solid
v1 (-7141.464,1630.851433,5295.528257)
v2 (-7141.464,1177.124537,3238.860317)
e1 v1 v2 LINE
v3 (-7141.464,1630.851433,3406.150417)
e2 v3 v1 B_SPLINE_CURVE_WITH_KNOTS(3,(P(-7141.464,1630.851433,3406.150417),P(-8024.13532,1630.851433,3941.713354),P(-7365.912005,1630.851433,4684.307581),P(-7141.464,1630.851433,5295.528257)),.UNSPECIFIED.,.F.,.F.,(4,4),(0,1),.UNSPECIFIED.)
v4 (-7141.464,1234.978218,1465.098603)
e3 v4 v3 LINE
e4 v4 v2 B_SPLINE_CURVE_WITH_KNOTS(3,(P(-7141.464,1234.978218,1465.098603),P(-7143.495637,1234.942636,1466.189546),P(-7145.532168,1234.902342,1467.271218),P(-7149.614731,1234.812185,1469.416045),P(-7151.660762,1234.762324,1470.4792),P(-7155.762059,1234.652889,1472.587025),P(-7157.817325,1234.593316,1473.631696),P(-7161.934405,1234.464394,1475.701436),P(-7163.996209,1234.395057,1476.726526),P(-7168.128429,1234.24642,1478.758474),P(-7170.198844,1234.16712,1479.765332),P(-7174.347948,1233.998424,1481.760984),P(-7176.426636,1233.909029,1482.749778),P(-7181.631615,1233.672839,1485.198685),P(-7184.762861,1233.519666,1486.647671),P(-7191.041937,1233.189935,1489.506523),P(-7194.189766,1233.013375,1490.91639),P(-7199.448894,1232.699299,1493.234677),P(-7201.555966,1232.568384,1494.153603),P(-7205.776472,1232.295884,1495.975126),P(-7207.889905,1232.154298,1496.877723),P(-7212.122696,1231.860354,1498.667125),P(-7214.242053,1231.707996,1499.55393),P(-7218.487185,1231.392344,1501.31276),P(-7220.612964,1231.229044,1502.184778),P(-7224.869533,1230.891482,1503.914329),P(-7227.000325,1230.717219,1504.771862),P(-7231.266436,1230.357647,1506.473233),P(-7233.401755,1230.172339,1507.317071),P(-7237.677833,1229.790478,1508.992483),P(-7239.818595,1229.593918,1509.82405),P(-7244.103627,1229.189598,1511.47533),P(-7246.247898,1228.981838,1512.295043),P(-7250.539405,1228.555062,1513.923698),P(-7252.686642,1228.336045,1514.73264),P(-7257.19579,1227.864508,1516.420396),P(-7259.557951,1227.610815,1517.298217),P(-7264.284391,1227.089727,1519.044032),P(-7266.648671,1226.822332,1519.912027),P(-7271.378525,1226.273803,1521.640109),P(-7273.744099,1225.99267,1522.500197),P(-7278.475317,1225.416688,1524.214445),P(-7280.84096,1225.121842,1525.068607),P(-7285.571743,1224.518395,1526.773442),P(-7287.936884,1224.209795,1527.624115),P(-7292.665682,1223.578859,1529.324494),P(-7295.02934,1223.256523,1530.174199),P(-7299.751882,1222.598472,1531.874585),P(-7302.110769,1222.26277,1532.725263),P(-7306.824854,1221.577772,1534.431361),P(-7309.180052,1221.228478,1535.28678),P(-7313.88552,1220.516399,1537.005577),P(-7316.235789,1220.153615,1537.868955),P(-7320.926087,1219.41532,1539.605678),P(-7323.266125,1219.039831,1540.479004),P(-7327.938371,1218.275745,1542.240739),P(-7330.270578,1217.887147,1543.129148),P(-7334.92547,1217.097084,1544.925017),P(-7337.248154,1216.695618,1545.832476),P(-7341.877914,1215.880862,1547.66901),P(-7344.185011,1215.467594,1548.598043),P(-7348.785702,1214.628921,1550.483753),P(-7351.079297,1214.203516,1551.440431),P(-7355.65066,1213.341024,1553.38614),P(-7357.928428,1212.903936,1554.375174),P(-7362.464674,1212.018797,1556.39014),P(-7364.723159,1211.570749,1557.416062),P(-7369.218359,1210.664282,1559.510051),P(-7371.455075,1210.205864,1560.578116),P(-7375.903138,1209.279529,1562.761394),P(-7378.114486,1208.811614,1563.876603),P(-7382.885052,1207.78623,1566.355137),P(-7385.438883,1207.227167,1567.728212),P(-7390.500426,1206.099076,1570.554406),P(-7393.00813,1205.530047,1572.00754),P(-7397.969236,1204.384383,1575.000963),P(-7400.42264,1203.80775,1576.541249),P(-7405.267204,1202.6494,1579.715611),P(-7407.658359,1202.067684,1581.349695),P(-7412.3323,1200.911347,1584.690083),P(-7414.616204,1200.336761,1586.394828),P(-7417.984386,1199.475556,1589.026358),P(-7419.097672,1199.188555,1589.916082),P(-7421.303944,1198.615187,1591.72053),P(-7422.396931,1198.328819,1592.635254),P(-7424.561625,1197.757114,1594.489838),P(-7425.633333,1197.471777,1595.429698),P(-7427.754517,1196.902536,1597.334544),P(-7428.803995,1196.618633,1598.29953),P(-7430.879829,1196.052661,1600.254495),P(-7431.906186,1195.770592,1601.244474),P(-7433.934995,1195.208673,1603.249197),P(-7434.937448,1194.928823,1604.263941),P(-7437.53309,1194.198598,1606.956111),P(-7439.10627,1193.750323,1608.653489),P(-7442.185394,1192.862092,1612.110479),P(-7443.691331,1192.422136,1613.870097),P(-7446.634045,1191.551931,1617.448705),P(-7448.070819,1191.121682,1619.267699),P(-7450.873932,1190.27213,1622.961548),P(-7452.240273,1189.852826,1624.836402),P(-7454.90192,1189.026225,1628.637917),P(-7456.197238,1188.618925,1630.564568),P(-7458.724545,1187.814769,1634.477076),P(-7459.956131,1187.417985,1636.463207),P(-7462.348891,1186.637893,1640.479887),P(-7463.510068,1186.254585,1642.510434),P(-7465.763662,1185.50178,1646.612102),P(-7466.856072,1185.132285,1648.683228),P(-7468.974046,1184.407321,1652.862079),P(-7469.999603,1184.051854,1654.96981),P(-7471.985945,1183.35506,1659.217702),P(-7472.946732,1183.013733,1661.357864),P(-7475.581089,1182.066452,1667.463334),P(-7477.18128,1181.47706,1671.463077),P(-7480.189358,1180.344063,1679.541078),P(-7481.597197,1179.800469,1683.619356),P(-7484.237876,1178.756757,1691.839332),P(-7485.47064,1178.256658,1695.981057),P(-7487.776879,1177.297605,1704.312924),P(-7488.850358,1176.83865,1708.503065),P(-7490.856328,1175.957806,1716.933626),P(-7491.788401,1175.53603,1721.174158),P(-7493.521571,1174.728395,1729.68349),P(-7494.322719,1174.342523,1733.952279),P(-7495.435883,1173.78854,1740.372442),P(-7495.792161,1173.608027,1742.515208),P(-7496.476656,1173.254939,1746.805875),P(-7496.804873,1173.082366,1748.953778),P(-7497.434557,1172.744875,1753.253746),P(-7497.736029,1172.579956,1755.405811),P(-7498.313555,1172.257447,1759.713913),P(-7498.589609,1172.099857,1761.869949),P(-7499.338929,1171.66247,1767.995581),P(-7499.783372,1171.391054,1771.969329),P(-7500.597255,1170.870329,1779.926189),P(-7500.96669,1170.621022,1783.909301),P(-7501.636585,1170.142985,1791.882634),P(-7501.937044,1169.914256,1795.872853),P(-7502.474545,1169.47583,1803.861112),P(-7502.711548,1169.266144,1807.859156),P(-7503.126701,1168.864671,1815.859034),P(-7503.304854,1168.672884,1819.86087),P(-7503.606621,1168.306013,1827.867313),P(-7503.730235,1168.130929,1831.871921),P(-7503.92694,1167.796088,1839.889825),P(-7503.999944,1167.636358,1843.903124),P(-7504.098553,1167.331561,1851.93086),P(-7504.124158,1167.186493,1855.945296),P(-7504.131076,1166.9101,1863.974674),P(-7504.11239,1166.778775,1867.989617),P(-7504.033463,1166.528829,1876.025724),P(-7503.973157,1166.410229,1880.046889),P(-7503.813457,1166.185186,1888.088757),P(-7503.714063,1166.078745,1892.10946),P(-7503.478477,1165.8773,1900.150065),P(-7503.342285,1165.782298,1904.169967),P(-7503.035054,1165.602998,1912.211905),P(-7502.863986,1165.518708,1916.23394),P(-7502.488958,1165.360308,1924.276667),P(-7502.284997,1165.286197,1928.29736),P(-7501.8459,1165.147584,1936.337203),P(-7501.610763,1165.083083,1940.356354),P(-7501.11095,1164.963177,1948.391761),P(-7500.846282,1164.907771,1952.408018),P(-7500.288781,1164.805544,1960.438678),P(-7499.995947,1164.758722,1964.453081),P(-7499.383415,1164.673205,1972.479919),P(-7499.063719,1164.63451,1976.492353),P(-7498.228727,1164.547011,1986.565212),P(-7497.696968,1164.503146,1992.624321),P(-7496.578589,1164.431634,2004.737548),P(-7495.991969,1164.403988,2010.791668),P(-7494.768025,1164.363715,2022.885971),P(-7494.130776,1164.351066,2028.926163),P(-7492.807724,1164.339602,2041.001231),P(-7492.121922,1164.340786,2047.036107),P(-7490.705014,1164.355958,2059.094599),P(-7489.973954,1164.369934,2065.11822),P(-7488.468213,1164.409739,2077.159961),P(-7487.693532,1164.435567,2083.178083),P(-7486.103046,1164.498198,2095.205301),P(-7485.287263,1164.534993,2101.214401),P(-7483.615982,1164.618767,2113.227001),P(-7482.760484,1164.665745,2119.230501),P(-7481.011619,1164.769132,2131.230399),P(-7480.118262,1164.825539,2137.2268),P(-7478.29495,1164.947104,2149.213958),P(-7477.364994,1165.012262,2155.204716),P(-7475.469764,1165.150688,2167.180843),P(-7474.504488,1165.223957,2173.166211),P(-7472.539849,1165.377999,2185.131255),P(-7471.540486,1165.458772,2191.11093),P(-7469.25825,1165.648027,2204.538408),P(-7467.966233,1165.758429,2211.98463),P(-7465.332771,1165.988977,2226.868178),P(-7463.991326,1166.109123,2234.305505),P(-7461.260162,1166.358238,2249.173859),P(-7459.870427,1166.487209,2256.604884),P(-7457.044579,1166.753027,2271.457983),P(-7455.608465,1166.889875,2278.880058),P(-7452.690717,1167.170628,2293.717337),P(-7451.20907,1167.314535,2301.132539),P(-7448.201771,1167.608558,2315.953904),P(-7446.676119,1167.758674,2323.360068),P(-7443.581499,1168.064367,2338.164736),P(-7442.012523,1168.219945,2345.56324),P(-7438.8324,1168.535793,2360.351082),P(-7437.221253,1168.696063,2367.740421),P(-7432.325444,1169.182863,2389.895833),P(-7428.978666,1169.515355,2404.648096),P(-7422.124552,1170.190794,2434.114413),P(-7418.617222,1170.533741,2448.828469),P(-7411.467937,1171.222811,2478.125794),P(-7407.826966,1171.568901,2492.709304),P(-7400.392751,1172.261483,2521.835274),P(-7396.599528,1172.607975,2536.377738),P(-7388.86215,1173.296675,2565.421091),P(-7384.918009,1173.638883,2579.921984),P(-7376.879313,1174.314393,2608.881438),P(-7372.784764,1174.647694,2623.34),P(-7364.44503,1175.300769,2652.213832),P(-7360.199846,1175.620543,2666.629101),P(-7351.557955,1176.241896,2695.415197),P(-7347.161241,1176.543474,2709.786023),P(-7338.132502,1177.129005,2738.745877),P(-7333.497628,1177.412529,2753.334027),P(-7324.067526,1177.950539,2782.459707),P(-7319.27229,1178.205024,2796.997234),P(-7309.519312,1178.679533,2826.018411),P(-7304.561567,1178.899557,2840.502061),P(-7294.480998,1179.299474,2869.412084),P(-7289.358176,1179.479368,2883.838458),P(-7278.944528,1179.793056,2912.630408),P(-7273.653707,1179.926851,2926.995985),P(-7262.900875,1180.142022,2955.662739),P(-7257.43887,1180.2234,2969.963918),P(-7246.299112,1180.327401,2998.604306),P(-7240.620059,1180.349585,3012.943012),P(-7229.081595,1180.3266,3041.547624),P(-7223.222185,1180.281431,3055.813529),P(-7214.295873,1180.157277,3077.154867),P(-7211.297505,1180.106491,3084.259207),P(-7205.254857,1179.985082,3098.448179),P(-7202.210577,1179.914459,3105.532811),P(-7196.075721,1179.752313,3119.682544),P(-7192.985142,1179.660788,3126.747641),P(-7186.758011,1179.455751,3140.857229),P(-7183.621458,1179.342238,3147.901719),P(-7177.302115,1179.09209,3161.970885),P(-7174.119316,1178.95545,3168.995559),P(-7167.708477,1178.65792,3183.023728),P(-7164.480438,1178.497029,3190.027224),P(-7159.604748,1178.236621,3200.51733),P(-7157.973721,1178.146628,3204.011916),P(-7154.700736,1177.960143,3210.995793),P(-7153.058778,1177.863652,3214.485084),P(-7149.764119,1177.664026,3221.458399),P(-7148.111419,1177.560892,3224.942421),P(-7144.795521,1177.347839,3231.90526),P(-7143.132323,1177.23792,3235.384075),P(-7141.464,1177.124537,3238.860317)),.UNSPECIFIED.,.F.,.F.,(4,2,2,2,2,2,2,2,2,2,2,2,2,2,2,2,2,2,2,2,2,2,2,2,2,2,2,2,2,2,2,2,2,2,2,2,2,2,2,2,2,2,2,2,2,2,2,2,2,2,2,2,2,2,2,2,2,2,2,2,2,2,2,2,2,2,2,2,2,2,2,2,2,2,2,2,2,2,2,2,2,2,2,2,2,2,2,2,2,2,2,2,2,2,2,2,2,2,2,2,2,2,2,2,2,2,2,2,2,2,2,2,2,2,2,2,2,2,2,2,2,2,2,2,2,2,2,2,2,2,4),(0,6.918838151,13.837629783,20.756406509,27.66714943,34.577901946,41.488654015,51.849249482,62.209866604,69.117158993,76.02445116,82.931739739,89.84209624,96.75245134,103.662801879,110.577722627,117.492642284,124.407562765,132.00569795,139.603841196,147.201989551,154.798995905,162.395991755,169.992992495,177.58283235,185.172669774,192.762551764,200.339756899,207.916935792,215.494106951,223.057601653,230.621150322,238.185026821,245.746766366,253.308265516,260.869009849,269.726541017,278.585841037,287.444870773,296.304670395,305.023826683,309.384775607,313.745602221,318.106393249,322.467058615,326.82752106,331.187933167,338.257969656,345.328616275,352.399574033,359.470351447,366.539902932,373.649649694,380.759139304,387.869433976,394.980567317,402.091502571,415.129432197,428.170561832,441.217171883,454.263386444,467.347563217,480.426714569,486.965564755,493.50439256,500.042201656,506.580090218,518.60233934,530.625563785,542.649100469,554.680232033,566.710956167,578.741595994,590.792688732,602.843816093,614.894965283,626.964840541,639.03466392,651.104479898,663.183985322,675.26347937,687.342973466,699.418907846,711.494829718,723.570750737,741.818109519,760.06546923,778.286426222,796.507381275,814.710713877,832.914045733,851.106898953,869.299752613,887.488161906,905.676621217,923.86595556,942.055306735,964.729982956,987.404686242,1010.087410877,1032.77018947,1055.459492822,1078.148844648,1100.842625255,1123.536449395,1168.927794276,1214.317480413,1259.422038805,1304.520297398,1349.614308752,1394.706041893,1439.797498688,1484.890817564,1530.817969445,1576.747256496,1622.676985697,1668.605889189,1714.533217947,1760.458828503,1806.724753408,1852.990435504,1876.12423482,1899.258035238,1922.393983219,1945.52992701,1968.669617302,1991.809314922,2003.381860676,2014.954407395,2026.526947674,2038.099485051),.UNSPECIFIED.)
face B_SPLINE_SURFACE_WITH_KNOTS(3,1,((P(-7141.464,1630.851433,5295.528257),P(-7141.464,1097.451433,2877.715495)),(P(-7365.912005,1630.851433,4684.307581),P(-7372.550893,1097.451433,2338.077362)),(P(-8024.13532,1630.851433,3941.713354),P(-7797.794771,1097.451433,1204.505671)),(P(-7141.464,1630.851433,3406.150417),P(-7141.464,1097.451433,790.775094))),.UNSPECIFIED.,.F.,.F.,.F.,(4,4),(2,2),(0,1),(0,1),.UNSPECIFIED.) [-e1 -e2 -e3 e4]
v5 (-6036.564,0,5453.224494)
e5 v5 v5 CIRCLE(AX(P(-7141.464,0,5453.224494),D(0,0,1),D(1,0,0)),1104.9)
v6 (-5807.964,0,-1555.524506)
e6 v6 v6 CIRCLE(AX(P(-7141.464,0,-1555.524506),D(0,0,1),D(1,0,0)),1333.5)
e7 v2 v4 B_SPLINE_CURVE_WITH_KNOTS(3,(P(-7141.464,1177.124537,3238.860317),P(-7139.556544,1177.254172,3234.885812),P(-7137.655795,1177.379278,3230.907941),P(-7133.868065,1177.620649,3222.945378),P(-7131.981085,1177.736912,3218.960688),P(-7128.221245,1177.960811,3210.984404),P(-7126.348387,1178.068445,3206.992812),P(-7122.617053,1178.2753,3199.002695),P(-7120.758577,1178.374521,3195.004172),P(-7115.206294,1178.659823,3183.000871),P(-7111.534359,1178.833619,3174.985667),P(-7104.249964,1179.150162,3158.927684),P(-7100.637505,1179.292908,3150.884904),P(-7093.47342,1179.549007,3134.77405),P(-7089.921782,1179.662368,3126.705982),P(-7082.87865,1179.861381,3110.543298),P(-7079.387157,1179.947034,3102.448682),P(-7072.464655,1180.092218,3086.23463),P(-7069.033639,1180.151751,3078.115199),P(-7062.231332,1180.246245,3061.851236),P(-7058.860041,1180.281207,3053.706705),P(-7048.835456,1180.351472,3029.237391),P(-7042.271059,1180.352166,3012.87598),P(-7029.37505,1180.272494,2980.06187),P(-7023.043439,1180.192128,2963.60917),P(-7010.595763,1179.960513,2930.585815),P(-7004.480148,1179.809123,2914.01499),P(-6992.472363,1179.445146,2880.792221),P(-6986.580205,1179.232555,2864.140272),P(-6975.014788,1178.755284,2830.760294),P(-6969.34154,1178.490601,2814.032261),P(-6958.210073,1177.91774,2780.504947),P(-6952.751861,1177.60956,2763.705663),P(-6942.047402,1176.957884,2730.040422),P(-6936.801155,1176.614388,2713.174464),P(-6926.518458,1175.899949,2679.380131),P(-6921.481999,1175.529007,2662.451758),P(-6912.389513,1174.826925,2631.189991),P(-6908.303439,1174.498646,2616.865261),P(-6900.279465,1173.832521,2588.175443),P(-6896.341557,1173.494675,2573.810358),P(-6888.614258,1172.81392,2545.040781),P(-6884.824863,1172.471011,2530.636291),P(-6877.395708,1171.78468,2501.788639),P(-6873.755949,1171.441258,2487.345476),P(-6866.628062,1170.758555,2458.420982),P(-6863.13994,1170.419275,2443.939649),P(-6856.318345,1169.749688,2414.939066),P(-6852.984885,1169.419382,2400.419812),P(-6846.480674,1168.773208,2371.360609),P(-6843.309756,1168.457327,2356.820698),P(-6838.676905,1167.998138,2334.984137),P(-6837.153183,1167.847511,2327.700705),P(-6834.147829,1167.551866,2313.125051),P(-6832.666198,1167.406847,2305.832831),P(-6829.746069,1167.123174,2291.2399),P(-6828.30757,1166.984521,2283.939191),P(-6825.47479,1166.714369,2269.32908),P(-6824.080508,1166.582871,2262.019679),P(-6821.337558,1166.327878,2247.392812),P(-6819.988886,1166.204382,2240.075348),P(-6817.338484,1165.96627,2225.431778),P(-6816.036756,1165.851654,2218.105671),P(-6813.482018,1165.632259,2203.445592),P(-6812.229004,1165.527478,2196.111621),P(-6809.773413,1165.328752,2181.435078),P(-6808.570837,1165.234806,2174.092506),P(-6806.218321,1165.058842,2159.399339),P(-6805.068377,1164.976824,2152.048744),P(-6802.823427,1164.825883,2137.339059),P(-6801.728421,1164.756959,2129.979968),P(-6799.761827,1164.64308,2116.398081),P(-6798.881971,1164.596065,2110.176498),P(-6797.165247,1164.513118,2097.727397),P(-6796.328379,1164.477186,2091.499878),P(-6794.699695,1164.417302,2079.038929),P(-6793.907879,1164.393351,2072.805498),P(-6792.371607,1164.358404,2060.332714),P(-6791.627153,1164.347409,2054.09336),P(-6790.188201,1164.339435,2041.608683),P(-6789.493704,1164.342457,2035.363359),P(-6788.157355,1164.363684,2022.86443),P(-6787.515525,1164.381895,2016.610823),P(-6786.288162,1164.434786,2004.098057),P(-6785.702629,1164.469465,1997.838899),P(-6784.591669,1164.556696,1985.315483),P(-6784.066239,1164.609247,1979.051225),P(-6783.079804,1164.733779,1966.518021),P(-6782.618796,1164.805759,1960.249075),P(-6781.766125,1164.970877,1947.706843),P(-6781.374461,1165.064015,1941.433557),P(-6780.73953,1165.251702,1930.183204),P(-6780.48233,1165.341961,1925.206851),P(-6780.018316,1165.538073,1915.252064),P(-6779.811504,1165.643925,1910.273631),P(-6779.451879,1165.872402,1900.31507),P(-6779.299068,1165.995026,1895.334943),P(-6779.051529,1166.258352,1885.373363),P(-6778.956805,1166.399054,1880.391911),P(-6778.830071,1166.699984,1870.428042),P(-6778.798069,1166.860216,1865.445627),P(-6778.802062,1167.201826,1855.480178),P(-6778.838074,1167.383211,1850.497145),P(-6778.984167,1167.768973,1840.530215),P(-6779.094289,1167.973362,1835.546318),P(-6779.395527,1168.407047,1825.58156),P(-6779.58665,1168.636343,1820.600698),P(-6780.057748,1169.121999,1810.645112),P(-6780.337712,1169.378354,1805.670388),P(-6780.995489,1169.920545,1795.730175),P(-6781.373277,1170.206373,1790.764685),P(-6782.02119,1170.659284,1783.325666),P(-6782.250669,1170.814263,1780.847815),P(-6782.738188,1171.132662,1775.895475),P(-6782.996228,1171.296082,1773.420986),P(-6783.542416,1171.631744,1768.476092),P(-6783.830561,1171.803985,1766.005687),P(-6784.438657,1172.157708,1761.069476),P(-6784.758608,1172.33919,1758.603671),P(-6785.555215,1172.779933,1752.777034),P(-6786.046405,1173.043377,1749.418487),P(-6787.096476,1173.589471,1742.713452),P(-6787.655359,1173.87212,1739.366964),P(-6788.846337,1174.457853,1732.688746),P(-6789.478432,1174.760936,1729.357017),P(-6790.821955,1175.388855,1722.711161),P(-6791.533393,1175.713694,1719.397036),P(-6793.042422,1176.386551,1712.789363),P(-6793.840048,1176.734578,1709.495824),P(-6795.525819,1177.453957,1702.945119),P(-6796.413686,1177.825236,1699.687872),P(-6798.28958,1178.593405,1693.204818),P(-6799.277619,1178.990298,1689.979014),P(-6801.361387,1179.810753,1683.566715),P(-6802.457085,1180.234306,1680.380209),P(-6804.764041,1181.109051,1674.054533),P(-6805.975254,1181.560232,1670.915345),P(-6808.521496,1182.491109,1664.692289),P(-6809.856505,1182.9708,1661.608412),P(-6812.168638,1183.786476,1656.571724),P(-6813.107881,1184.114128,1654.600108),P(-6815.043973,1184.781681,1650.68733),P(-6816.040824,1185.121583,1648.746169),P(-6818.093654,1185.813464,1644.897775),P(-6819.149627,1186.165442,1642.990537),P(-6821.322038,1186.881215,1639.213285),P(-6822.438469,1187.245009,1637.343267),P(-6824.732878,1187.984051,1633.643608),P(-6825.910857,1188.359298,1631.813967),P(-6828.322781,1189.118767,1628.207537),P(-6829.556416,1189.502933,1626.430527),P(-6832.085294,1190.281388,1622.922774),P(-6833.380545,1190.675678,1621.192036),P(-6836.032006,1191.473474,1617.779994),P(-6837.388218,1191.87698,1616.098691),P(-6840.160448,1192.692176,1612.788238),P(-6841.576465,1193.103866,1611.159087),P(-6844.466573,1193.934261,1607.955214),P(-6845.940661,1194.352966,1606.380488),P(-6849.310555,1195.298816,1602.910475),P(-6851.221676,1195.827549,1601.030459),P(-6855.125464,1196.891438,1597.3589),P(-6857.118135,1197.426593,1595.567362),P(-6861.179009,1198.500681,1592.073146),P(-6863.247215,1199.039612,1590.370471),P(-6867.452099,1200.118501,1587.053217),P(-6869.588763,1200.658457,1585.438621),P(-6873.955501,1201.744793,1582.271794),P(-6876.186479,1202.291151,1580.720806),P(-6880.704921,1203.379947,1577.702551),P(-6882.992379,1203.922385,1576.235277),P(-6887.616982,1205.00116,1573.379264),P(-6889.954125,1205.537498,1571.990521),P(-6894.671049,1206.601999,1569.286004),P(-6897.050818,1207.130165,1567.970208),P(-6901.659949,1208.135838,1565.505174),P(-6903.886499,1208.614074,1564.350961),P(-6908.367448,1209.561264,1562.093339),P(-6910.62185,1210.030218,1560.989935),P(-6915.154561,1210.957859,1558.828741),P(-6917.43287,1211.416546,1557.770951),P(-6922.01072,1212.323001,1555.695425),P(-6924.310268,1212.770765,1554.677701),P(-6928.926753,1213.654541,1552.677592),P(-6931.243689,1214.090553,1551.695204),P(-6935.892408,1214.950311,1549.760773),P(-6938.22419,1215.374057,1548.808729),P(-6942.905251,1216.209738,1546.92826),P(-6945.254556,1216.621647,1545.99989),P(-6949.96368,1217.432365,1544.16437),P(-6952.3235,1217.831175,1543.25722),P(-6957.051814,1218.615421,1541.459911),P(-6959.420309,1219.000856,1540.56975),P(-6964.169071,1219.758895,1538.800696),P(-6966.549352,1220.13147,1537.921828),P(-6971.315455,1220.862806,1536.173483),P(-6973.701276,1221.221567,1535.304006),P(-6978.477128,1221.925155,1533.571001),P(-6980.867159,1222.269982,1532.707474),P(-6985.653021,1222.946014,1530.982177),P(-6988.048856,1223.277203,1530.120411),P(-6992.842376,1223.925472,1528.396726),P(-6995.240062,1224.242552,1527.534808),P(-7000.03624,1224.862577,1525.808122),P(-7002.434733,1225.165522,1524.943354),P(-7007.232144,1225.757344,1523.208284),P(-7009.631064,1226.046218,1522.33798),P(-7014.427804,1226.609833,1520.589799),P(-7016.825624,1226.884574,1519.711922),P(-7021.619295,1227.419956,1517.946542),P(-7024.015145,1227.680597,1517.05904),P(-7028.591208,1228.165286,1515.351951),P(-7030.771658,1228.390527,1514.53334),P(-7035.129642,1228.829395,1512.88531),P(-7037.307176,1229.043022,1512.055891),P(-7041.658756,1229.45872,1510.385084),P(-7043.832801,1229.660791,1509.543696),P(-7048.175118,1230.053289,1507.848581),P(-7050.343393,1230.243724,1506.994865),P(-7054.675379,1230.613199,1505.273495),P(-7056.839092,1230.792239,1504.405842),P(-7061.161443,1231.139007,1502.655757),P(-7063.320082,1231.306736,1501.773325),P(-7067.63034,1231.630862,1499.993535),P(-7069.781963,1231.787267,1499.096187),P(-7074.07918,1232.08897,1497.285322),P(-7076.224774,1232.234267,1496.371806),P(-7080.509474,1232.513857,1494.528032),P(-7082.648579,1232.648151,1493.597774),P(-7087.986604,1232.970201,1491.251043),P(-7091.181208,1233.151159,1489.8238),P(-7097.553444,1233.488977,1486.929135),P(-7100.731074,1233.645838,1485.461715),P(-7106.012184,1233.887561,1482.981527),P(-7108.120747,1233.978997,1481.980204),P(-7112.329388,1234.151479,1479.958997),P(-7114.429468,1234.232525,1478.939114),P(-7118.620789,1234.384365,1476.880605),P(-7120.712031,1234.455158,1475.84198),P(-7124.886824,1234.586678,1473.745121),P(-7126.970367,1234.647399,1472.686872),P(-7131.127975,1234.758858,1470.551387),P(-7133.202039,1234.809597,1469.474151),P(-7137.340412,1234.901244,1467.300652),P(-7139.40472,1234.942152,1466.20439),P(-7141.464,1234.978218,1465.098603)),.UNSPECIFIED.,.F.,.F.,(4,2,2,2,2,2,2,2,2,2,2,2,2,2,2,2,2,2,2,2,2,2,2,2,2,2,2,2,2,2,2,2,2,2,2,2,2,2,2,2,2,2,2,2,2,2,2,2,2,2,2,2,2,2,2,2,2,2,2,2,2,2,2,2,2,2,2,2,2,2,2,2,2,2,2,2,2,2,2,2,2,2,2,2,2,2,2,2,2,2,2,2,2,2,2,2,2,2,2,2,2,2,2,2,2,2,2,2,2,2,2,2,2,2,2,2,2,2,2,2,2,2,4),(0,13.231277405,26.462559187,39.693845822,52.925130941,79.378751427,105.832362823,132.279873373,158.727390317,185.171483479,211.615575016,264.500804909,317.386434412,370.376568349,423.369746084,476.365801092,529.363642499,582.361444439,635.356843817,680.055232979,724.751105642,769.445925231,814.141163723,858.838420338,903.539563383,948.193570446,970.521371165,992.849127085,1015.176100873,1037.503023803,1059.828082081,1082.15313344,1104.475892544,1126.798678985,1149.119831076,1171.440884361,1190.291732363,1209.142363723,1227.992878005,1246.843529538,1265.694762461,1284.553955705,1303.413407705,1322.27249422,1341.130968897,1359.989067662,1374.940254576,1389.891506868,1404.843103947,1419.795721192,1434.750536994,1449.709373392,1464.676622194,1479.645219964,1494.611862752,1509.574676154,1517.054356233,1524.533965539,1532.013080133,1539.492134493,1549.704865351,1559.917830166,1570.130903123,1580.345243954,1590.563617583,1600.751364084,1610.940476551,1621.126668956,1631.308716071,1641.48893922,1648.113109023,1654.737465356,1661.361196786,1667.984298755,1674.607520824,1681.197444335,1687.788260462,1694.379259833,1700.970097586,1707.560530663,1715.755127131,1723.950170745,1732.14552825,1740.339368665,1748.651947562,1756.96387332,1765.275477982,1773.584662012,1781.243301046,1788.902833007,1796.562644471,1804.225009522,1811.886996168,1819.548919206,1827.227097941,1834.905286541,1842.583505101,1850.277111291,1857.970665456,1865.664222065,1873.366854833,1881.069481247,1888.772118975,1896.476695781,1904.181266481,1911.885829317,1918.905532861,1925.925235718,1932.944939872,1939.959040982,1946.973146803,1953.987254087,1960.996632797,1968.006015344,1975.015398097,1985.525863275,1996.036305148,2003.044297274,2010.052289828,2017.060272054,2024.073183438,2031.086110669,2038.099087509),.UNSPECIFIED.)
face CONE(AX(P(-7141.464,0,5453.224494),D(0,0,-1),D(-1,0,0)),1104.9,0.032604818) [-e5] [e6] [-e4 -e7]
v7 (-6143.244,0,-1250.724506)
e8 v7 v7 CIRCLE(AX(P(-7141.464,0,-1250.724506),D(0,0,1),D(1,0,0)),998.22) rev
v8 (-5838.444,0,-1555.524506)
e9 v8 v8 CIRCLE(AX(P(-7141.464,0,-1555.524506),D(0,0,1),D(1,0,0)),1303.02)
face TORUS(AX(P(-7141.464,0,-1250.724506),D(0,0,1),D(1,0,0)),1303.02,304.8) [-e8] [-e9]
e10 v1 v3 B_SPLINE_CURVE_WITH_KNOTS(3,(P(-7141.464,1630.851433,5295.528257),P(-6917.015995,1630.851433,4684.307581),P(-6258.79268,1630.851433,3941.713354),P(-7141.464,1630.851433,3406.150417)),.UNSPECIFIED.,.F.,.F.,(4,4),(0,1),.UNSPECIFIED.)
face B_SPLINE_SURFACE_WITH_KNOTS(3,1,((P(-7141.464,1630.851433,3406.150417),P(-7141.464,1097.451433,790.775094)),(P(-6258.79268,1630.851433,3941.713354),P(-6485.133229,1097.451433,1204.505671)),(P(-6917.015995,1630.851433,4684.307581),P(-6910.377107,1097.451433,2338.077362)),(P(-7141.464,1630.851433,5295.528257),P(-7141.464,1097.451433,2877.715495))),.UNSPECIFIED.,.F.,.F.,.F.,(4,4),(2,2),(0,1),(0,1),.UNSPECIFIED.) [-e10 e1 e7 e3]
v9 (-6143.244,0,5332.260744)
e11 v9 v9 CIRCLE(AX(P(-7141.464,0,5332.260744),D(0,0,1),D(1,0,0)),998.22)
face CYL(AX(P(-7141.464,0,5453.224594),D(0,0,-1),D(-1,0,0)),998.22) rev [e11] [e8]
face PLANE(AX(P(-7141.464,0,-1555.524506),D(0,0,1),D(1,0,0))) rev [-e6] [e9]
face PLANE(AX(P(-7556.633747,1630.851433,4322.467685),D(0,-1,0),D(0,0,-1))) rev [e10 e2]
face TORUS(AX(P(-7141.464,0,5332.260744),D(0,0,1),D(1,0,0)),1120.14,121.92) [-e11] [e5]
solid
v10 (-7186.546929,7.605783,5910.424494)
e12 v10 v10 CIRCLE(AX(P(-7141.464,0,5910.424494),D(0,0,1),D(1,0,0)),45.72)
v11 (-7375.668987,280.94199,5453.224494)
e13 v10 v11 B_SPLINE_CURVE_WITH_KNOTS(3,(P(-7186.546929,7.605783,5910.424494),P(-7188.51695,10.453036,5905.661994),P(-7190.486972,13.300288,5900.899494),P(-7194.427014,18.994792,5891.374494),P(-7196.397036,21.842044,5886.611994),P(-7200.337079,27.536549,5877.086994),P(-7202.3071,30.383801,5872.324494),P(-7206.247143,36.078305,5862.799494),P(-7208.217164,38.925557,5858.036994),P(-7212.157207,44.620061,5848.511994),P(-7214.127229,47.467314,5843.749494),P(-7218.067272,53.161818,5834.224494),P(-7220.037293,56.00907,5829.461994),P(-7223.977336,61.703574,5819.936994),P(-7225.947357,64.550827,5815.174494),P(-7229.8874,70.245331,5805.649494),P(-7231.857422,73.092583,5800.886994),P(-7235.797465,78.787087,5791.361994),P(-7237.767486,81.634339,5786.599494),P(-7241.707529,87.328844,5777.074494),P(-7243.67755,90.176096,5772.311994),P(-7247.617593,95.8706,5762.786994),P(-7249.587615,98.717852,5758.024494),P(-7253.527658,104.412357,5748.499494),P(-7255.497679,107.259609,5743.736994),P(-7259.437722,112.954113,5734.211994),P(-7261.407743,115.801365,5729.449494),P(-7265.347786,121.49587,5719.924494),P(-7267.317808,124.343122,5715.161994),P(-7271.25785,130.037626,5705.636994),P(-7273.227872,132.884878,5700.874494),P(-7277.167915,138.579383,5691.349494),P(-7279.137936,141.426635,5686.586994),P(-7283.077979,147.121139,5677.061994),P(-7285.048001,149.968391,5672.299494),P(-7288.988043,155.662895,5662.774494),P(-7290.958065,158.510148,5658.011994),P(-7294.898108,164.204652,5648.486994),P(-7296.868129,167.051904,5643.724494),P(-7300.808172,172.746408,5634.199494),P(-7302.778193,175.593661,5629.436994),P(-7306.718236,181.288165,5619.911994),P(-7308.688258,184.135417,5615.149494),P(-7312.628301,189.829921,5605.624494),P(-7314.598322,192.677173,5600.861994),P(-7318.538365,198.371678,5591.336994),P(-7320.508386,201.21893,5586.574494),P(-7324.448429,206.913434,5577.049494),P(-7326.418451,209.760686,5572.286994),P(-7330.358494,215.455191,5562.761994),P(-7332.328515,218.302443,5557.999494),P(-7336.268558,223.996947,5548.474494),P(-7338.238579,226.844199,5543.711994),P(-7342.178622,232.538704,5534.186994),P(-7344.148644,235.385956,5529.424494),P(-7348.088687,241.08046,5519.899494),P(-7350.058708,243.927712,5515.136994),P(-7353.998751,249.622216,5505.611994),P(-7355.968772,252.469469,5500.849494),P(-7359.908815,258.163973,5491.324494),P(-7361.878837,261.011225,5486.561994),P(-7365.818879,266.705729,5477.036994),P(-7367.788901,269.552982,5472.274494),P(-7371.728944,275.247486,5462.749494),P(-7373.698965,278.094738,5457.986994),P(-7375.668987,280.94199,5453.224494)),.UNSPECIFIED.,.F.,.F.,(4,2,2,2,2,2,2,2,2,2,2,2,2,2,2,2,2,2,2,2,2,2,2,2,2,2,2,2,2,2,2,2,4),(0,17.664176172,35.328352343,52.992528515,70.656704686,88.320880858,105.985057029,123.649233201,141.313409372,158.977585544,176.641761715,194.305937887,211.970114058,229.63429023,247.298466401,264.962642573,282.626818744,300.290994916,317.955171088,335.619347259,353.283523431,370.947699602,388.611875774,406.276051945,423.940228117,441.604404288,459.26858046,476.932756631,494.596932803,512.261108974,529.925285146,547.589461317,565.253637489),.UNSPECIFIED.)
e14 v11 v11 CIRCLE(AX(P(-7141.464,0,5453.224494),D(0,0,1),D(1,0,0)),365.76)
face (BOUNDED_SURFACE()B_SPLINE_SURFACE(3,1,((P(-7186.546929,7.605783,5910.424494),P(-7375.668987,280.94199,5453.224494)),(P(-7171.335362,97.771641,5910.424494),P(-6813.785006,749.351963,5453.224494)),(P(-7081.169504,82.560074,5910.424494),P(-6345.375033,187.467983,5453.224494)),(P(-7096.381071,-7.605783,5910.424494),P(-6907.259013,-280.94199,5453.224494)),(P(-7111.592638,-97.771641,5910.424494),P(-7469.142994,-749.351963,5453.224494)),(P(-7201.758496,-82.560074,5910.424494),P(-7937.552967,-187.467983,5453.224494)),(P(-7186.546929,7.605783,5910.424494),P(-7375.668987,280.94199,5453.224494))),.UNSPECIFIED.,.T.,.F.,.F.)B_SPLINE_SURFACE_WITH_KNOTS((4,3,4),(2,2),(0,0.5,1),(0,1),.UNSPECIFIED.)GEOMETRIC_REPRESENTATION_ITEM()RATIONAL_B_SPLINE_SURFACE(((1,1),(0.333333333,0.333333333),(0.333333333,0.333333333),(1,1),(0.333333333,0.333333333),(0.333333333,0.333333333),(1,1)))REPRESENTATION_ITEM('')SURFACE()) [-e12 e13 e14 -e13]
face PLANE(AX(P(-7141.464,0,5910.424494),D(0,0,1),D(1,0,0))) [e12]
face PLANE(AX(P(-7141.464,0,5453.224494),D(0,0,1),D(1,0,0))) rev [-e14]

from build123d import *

# Parameters (mm, degrees)
SKETCH13_R              = 1333.5
SKETCH14_R              = 1104.9
CUT_EXTRUDE1_DEPTH      = 11079.167700467
CUT_EXTRUDE1_DEPTH_BACK = 11079.167700467
SKETCH16_R              = 998.22
FILLET1_R               = 304.8
FILLET2_R               = 121.92


with BuildPart() as part:
    # Sketch13 → Loft2 section 0
    with BuildSketch(Plane.XY.offset(-1555.524505737)):
        with Locations((-7141.464, 0)):
            Circle(SKETCH13_R)
    # Sketch14 → Loft2 section 1
    with BuildSketch(Plane.XY.offset(5453.224494263)):
        with Locations((-7141.464, 0)):
            Circle(SKETCH14_R)
    loft()

    # Sketch16 → Cut-Extrude1 (cut, two sides: drawn at the far end of the back side and taken through both)
    with BuildSketch(Plane(origin=(0, 0, -1555.524505737), x_dir=(-1, 0, 0), z_dir=(0, 0, -1)).offset(-CUT_EXTRUDE1_DEPTH_BACK)):
        with Locations(Location((7141.464, 0, 0), (0, 0, 180))):
            Circle(SKETCH16_R)
    extrude(amount=CUT_EXTRUDE1_DEPTH + CUT_EXTRUDE1_DEPTH_BACK, mode=Mode.SUBTRACT)

    # Fillet1
    fillet1_edges = [part.edges().sort_by_distance(p)[0] for p in [
        (-8139.684, 0, -1555.524505737),
    ]]
    fillet(fillet1_edges, radius=FILLET1_R)

    # Fillet2
    # the kernel refuses this fillet: 121.92 mm, written as the material it takes off along each edge
    with BuildSketch(Plane(origin=(-7141.464, 0, 5453.224494263), x_dir=(1, 0, 0), z_dir=(0, 1, 0))) as fillet2_piece_1:
        with BuildLine():
            CenterArc((1120.14, 120.963749942), FILLET2_R, 180, 82.819244219)
            Line((1104.9, 0), (1104.5952, -2.419274999))
            ThreePointArc((1104.5952, -2.419274999), (1051.56, -2.4384), (998.22, -2.4384))
            Line((998.22, -2.4384), (995.7816, 0))
            Line((995.7816, 0), (995.7816, 120.963749942))
            Line((995.7816, 120.963749942), (998.22, 120.963749942))
        make_face()
    revolve(axis=Axis((-7141.464, 0, 5453.224494263), (0, 0, -1)), mode=Mode.SUBTRACT)

    # Sketch20 → Loft4 section 0
    with BuildSketch(Plane(origin=(0, 1630.85143289, 0), x_dir=(1, 0, 0), z_dir=(0, 1, 0))):
        with BuildLine():
            add(Edge.make_bspline(
                [(-7141.464, -3406.150417238), (-6258.792679908, -3941.713353622), (-6917.015995223, -4684.307581352), (-7141.464, -5295.528257059)],
                knots=[0, 0, 0, 0, 1, 1, 1, 1], degree=3))
            add(Edge.make_bspline(
                [(-7141.464, -3406.150417238), (-8024.135320092, -3941.713353622), (-7365.912004777, -4684.307581352), (-7141.464, -5295.528257059)],
                knots=[0, 0, 0, 0, 1, 1, 1, 1], degree=3))
        make_face()
    # Sketch17 → Loft4 section 1
    with BuildSketch(Plane(origin=(0, 1097.45143289, 0), x_dir=(1, 0, 0), z_dir=(0, 1, 0))):
        with BuildLine():
            add(Edge.make_bspline(
                [(-7141.464, -790.775094263), (-6485.133228657, -1204.505671061), (-6910.377107034, -2338.077362285), (-7141.464, -2877.715495293)],
                knots=[0, 0, 0, 0, 1, 1, 1, 1], degree=3))
            add(Edge.make_bspline(
                [(-7141.464, -790.775094263), (-7797.794771343, -1204.505671061), (-7372.550892966, -2338.077362285), (-7141.464, -2877.715495293)],
                knots=[0, 0, 0, 0, 1, 1, 1, 1], degree=3))
        make_face()
    loft()


with BuildPart() as body_2:
    # Loft3: read off the stored shape, not the designer's step
    # Loft3: loft between two sections, ruled curve by curve
    loft3_from = [
        Edge.make_bspline([(-7186.546928673, 7.605783475, 5910.424494263), (-7171.335361724, 97.771640821, 5910.424494263), (-7081.169504378, 82.560073871, 5910.424494263), (-7096.381071327, -7.605783475, 5910.424494263), (-7111.592638276, -97.771640821, 5910.424494263), (-7201.758495622, -82.560073871, 5910.424494263), (-7186.546928673, 7.605783475, 5910.424494263)], [0, 0, 0, 0, 0.5, 0.5, 0.5, 1, 1, 1, 1], 3, [1, 0.333333333, 0.333333333, 1, 0.333333333, 0.333333333, 1]),
    ]
    loft3_to = [
        Edge.make_bspline([(-7375.668986618, 280.941990174, 5453.224494263), (-6813.78500627, 749.351963411, 5453.224494263), (-6345.375033033, 187.467983062, 5453.224494263), (-6907.259013382, -280.941990174, 5453.224494263), (-7469.14299373, -749.351963411, 5453.224494263), (-7937.552966967, -187.467983062, 5453.224494263), (-7375.668986618, 280.941990174, 5453.224494263)], [0, 0, 0, 0, 0.5, 0.5, 0.5, 1, 1, 1, 1], 3, [1, 0.333333333, 0.333333333, 1, 0.333333333, 0.333333333, 1]),
    ]
    loft3 = Solid(Shell([*[Face.make_surface_from_curves(loft3_from[k], loft3_to[k]) for k in range(1)], Face(Wire(loft3_from)), Face(Wire(loft3_to))]))
    add(loft3)


solid = Compound([part.part, body_2.part])
